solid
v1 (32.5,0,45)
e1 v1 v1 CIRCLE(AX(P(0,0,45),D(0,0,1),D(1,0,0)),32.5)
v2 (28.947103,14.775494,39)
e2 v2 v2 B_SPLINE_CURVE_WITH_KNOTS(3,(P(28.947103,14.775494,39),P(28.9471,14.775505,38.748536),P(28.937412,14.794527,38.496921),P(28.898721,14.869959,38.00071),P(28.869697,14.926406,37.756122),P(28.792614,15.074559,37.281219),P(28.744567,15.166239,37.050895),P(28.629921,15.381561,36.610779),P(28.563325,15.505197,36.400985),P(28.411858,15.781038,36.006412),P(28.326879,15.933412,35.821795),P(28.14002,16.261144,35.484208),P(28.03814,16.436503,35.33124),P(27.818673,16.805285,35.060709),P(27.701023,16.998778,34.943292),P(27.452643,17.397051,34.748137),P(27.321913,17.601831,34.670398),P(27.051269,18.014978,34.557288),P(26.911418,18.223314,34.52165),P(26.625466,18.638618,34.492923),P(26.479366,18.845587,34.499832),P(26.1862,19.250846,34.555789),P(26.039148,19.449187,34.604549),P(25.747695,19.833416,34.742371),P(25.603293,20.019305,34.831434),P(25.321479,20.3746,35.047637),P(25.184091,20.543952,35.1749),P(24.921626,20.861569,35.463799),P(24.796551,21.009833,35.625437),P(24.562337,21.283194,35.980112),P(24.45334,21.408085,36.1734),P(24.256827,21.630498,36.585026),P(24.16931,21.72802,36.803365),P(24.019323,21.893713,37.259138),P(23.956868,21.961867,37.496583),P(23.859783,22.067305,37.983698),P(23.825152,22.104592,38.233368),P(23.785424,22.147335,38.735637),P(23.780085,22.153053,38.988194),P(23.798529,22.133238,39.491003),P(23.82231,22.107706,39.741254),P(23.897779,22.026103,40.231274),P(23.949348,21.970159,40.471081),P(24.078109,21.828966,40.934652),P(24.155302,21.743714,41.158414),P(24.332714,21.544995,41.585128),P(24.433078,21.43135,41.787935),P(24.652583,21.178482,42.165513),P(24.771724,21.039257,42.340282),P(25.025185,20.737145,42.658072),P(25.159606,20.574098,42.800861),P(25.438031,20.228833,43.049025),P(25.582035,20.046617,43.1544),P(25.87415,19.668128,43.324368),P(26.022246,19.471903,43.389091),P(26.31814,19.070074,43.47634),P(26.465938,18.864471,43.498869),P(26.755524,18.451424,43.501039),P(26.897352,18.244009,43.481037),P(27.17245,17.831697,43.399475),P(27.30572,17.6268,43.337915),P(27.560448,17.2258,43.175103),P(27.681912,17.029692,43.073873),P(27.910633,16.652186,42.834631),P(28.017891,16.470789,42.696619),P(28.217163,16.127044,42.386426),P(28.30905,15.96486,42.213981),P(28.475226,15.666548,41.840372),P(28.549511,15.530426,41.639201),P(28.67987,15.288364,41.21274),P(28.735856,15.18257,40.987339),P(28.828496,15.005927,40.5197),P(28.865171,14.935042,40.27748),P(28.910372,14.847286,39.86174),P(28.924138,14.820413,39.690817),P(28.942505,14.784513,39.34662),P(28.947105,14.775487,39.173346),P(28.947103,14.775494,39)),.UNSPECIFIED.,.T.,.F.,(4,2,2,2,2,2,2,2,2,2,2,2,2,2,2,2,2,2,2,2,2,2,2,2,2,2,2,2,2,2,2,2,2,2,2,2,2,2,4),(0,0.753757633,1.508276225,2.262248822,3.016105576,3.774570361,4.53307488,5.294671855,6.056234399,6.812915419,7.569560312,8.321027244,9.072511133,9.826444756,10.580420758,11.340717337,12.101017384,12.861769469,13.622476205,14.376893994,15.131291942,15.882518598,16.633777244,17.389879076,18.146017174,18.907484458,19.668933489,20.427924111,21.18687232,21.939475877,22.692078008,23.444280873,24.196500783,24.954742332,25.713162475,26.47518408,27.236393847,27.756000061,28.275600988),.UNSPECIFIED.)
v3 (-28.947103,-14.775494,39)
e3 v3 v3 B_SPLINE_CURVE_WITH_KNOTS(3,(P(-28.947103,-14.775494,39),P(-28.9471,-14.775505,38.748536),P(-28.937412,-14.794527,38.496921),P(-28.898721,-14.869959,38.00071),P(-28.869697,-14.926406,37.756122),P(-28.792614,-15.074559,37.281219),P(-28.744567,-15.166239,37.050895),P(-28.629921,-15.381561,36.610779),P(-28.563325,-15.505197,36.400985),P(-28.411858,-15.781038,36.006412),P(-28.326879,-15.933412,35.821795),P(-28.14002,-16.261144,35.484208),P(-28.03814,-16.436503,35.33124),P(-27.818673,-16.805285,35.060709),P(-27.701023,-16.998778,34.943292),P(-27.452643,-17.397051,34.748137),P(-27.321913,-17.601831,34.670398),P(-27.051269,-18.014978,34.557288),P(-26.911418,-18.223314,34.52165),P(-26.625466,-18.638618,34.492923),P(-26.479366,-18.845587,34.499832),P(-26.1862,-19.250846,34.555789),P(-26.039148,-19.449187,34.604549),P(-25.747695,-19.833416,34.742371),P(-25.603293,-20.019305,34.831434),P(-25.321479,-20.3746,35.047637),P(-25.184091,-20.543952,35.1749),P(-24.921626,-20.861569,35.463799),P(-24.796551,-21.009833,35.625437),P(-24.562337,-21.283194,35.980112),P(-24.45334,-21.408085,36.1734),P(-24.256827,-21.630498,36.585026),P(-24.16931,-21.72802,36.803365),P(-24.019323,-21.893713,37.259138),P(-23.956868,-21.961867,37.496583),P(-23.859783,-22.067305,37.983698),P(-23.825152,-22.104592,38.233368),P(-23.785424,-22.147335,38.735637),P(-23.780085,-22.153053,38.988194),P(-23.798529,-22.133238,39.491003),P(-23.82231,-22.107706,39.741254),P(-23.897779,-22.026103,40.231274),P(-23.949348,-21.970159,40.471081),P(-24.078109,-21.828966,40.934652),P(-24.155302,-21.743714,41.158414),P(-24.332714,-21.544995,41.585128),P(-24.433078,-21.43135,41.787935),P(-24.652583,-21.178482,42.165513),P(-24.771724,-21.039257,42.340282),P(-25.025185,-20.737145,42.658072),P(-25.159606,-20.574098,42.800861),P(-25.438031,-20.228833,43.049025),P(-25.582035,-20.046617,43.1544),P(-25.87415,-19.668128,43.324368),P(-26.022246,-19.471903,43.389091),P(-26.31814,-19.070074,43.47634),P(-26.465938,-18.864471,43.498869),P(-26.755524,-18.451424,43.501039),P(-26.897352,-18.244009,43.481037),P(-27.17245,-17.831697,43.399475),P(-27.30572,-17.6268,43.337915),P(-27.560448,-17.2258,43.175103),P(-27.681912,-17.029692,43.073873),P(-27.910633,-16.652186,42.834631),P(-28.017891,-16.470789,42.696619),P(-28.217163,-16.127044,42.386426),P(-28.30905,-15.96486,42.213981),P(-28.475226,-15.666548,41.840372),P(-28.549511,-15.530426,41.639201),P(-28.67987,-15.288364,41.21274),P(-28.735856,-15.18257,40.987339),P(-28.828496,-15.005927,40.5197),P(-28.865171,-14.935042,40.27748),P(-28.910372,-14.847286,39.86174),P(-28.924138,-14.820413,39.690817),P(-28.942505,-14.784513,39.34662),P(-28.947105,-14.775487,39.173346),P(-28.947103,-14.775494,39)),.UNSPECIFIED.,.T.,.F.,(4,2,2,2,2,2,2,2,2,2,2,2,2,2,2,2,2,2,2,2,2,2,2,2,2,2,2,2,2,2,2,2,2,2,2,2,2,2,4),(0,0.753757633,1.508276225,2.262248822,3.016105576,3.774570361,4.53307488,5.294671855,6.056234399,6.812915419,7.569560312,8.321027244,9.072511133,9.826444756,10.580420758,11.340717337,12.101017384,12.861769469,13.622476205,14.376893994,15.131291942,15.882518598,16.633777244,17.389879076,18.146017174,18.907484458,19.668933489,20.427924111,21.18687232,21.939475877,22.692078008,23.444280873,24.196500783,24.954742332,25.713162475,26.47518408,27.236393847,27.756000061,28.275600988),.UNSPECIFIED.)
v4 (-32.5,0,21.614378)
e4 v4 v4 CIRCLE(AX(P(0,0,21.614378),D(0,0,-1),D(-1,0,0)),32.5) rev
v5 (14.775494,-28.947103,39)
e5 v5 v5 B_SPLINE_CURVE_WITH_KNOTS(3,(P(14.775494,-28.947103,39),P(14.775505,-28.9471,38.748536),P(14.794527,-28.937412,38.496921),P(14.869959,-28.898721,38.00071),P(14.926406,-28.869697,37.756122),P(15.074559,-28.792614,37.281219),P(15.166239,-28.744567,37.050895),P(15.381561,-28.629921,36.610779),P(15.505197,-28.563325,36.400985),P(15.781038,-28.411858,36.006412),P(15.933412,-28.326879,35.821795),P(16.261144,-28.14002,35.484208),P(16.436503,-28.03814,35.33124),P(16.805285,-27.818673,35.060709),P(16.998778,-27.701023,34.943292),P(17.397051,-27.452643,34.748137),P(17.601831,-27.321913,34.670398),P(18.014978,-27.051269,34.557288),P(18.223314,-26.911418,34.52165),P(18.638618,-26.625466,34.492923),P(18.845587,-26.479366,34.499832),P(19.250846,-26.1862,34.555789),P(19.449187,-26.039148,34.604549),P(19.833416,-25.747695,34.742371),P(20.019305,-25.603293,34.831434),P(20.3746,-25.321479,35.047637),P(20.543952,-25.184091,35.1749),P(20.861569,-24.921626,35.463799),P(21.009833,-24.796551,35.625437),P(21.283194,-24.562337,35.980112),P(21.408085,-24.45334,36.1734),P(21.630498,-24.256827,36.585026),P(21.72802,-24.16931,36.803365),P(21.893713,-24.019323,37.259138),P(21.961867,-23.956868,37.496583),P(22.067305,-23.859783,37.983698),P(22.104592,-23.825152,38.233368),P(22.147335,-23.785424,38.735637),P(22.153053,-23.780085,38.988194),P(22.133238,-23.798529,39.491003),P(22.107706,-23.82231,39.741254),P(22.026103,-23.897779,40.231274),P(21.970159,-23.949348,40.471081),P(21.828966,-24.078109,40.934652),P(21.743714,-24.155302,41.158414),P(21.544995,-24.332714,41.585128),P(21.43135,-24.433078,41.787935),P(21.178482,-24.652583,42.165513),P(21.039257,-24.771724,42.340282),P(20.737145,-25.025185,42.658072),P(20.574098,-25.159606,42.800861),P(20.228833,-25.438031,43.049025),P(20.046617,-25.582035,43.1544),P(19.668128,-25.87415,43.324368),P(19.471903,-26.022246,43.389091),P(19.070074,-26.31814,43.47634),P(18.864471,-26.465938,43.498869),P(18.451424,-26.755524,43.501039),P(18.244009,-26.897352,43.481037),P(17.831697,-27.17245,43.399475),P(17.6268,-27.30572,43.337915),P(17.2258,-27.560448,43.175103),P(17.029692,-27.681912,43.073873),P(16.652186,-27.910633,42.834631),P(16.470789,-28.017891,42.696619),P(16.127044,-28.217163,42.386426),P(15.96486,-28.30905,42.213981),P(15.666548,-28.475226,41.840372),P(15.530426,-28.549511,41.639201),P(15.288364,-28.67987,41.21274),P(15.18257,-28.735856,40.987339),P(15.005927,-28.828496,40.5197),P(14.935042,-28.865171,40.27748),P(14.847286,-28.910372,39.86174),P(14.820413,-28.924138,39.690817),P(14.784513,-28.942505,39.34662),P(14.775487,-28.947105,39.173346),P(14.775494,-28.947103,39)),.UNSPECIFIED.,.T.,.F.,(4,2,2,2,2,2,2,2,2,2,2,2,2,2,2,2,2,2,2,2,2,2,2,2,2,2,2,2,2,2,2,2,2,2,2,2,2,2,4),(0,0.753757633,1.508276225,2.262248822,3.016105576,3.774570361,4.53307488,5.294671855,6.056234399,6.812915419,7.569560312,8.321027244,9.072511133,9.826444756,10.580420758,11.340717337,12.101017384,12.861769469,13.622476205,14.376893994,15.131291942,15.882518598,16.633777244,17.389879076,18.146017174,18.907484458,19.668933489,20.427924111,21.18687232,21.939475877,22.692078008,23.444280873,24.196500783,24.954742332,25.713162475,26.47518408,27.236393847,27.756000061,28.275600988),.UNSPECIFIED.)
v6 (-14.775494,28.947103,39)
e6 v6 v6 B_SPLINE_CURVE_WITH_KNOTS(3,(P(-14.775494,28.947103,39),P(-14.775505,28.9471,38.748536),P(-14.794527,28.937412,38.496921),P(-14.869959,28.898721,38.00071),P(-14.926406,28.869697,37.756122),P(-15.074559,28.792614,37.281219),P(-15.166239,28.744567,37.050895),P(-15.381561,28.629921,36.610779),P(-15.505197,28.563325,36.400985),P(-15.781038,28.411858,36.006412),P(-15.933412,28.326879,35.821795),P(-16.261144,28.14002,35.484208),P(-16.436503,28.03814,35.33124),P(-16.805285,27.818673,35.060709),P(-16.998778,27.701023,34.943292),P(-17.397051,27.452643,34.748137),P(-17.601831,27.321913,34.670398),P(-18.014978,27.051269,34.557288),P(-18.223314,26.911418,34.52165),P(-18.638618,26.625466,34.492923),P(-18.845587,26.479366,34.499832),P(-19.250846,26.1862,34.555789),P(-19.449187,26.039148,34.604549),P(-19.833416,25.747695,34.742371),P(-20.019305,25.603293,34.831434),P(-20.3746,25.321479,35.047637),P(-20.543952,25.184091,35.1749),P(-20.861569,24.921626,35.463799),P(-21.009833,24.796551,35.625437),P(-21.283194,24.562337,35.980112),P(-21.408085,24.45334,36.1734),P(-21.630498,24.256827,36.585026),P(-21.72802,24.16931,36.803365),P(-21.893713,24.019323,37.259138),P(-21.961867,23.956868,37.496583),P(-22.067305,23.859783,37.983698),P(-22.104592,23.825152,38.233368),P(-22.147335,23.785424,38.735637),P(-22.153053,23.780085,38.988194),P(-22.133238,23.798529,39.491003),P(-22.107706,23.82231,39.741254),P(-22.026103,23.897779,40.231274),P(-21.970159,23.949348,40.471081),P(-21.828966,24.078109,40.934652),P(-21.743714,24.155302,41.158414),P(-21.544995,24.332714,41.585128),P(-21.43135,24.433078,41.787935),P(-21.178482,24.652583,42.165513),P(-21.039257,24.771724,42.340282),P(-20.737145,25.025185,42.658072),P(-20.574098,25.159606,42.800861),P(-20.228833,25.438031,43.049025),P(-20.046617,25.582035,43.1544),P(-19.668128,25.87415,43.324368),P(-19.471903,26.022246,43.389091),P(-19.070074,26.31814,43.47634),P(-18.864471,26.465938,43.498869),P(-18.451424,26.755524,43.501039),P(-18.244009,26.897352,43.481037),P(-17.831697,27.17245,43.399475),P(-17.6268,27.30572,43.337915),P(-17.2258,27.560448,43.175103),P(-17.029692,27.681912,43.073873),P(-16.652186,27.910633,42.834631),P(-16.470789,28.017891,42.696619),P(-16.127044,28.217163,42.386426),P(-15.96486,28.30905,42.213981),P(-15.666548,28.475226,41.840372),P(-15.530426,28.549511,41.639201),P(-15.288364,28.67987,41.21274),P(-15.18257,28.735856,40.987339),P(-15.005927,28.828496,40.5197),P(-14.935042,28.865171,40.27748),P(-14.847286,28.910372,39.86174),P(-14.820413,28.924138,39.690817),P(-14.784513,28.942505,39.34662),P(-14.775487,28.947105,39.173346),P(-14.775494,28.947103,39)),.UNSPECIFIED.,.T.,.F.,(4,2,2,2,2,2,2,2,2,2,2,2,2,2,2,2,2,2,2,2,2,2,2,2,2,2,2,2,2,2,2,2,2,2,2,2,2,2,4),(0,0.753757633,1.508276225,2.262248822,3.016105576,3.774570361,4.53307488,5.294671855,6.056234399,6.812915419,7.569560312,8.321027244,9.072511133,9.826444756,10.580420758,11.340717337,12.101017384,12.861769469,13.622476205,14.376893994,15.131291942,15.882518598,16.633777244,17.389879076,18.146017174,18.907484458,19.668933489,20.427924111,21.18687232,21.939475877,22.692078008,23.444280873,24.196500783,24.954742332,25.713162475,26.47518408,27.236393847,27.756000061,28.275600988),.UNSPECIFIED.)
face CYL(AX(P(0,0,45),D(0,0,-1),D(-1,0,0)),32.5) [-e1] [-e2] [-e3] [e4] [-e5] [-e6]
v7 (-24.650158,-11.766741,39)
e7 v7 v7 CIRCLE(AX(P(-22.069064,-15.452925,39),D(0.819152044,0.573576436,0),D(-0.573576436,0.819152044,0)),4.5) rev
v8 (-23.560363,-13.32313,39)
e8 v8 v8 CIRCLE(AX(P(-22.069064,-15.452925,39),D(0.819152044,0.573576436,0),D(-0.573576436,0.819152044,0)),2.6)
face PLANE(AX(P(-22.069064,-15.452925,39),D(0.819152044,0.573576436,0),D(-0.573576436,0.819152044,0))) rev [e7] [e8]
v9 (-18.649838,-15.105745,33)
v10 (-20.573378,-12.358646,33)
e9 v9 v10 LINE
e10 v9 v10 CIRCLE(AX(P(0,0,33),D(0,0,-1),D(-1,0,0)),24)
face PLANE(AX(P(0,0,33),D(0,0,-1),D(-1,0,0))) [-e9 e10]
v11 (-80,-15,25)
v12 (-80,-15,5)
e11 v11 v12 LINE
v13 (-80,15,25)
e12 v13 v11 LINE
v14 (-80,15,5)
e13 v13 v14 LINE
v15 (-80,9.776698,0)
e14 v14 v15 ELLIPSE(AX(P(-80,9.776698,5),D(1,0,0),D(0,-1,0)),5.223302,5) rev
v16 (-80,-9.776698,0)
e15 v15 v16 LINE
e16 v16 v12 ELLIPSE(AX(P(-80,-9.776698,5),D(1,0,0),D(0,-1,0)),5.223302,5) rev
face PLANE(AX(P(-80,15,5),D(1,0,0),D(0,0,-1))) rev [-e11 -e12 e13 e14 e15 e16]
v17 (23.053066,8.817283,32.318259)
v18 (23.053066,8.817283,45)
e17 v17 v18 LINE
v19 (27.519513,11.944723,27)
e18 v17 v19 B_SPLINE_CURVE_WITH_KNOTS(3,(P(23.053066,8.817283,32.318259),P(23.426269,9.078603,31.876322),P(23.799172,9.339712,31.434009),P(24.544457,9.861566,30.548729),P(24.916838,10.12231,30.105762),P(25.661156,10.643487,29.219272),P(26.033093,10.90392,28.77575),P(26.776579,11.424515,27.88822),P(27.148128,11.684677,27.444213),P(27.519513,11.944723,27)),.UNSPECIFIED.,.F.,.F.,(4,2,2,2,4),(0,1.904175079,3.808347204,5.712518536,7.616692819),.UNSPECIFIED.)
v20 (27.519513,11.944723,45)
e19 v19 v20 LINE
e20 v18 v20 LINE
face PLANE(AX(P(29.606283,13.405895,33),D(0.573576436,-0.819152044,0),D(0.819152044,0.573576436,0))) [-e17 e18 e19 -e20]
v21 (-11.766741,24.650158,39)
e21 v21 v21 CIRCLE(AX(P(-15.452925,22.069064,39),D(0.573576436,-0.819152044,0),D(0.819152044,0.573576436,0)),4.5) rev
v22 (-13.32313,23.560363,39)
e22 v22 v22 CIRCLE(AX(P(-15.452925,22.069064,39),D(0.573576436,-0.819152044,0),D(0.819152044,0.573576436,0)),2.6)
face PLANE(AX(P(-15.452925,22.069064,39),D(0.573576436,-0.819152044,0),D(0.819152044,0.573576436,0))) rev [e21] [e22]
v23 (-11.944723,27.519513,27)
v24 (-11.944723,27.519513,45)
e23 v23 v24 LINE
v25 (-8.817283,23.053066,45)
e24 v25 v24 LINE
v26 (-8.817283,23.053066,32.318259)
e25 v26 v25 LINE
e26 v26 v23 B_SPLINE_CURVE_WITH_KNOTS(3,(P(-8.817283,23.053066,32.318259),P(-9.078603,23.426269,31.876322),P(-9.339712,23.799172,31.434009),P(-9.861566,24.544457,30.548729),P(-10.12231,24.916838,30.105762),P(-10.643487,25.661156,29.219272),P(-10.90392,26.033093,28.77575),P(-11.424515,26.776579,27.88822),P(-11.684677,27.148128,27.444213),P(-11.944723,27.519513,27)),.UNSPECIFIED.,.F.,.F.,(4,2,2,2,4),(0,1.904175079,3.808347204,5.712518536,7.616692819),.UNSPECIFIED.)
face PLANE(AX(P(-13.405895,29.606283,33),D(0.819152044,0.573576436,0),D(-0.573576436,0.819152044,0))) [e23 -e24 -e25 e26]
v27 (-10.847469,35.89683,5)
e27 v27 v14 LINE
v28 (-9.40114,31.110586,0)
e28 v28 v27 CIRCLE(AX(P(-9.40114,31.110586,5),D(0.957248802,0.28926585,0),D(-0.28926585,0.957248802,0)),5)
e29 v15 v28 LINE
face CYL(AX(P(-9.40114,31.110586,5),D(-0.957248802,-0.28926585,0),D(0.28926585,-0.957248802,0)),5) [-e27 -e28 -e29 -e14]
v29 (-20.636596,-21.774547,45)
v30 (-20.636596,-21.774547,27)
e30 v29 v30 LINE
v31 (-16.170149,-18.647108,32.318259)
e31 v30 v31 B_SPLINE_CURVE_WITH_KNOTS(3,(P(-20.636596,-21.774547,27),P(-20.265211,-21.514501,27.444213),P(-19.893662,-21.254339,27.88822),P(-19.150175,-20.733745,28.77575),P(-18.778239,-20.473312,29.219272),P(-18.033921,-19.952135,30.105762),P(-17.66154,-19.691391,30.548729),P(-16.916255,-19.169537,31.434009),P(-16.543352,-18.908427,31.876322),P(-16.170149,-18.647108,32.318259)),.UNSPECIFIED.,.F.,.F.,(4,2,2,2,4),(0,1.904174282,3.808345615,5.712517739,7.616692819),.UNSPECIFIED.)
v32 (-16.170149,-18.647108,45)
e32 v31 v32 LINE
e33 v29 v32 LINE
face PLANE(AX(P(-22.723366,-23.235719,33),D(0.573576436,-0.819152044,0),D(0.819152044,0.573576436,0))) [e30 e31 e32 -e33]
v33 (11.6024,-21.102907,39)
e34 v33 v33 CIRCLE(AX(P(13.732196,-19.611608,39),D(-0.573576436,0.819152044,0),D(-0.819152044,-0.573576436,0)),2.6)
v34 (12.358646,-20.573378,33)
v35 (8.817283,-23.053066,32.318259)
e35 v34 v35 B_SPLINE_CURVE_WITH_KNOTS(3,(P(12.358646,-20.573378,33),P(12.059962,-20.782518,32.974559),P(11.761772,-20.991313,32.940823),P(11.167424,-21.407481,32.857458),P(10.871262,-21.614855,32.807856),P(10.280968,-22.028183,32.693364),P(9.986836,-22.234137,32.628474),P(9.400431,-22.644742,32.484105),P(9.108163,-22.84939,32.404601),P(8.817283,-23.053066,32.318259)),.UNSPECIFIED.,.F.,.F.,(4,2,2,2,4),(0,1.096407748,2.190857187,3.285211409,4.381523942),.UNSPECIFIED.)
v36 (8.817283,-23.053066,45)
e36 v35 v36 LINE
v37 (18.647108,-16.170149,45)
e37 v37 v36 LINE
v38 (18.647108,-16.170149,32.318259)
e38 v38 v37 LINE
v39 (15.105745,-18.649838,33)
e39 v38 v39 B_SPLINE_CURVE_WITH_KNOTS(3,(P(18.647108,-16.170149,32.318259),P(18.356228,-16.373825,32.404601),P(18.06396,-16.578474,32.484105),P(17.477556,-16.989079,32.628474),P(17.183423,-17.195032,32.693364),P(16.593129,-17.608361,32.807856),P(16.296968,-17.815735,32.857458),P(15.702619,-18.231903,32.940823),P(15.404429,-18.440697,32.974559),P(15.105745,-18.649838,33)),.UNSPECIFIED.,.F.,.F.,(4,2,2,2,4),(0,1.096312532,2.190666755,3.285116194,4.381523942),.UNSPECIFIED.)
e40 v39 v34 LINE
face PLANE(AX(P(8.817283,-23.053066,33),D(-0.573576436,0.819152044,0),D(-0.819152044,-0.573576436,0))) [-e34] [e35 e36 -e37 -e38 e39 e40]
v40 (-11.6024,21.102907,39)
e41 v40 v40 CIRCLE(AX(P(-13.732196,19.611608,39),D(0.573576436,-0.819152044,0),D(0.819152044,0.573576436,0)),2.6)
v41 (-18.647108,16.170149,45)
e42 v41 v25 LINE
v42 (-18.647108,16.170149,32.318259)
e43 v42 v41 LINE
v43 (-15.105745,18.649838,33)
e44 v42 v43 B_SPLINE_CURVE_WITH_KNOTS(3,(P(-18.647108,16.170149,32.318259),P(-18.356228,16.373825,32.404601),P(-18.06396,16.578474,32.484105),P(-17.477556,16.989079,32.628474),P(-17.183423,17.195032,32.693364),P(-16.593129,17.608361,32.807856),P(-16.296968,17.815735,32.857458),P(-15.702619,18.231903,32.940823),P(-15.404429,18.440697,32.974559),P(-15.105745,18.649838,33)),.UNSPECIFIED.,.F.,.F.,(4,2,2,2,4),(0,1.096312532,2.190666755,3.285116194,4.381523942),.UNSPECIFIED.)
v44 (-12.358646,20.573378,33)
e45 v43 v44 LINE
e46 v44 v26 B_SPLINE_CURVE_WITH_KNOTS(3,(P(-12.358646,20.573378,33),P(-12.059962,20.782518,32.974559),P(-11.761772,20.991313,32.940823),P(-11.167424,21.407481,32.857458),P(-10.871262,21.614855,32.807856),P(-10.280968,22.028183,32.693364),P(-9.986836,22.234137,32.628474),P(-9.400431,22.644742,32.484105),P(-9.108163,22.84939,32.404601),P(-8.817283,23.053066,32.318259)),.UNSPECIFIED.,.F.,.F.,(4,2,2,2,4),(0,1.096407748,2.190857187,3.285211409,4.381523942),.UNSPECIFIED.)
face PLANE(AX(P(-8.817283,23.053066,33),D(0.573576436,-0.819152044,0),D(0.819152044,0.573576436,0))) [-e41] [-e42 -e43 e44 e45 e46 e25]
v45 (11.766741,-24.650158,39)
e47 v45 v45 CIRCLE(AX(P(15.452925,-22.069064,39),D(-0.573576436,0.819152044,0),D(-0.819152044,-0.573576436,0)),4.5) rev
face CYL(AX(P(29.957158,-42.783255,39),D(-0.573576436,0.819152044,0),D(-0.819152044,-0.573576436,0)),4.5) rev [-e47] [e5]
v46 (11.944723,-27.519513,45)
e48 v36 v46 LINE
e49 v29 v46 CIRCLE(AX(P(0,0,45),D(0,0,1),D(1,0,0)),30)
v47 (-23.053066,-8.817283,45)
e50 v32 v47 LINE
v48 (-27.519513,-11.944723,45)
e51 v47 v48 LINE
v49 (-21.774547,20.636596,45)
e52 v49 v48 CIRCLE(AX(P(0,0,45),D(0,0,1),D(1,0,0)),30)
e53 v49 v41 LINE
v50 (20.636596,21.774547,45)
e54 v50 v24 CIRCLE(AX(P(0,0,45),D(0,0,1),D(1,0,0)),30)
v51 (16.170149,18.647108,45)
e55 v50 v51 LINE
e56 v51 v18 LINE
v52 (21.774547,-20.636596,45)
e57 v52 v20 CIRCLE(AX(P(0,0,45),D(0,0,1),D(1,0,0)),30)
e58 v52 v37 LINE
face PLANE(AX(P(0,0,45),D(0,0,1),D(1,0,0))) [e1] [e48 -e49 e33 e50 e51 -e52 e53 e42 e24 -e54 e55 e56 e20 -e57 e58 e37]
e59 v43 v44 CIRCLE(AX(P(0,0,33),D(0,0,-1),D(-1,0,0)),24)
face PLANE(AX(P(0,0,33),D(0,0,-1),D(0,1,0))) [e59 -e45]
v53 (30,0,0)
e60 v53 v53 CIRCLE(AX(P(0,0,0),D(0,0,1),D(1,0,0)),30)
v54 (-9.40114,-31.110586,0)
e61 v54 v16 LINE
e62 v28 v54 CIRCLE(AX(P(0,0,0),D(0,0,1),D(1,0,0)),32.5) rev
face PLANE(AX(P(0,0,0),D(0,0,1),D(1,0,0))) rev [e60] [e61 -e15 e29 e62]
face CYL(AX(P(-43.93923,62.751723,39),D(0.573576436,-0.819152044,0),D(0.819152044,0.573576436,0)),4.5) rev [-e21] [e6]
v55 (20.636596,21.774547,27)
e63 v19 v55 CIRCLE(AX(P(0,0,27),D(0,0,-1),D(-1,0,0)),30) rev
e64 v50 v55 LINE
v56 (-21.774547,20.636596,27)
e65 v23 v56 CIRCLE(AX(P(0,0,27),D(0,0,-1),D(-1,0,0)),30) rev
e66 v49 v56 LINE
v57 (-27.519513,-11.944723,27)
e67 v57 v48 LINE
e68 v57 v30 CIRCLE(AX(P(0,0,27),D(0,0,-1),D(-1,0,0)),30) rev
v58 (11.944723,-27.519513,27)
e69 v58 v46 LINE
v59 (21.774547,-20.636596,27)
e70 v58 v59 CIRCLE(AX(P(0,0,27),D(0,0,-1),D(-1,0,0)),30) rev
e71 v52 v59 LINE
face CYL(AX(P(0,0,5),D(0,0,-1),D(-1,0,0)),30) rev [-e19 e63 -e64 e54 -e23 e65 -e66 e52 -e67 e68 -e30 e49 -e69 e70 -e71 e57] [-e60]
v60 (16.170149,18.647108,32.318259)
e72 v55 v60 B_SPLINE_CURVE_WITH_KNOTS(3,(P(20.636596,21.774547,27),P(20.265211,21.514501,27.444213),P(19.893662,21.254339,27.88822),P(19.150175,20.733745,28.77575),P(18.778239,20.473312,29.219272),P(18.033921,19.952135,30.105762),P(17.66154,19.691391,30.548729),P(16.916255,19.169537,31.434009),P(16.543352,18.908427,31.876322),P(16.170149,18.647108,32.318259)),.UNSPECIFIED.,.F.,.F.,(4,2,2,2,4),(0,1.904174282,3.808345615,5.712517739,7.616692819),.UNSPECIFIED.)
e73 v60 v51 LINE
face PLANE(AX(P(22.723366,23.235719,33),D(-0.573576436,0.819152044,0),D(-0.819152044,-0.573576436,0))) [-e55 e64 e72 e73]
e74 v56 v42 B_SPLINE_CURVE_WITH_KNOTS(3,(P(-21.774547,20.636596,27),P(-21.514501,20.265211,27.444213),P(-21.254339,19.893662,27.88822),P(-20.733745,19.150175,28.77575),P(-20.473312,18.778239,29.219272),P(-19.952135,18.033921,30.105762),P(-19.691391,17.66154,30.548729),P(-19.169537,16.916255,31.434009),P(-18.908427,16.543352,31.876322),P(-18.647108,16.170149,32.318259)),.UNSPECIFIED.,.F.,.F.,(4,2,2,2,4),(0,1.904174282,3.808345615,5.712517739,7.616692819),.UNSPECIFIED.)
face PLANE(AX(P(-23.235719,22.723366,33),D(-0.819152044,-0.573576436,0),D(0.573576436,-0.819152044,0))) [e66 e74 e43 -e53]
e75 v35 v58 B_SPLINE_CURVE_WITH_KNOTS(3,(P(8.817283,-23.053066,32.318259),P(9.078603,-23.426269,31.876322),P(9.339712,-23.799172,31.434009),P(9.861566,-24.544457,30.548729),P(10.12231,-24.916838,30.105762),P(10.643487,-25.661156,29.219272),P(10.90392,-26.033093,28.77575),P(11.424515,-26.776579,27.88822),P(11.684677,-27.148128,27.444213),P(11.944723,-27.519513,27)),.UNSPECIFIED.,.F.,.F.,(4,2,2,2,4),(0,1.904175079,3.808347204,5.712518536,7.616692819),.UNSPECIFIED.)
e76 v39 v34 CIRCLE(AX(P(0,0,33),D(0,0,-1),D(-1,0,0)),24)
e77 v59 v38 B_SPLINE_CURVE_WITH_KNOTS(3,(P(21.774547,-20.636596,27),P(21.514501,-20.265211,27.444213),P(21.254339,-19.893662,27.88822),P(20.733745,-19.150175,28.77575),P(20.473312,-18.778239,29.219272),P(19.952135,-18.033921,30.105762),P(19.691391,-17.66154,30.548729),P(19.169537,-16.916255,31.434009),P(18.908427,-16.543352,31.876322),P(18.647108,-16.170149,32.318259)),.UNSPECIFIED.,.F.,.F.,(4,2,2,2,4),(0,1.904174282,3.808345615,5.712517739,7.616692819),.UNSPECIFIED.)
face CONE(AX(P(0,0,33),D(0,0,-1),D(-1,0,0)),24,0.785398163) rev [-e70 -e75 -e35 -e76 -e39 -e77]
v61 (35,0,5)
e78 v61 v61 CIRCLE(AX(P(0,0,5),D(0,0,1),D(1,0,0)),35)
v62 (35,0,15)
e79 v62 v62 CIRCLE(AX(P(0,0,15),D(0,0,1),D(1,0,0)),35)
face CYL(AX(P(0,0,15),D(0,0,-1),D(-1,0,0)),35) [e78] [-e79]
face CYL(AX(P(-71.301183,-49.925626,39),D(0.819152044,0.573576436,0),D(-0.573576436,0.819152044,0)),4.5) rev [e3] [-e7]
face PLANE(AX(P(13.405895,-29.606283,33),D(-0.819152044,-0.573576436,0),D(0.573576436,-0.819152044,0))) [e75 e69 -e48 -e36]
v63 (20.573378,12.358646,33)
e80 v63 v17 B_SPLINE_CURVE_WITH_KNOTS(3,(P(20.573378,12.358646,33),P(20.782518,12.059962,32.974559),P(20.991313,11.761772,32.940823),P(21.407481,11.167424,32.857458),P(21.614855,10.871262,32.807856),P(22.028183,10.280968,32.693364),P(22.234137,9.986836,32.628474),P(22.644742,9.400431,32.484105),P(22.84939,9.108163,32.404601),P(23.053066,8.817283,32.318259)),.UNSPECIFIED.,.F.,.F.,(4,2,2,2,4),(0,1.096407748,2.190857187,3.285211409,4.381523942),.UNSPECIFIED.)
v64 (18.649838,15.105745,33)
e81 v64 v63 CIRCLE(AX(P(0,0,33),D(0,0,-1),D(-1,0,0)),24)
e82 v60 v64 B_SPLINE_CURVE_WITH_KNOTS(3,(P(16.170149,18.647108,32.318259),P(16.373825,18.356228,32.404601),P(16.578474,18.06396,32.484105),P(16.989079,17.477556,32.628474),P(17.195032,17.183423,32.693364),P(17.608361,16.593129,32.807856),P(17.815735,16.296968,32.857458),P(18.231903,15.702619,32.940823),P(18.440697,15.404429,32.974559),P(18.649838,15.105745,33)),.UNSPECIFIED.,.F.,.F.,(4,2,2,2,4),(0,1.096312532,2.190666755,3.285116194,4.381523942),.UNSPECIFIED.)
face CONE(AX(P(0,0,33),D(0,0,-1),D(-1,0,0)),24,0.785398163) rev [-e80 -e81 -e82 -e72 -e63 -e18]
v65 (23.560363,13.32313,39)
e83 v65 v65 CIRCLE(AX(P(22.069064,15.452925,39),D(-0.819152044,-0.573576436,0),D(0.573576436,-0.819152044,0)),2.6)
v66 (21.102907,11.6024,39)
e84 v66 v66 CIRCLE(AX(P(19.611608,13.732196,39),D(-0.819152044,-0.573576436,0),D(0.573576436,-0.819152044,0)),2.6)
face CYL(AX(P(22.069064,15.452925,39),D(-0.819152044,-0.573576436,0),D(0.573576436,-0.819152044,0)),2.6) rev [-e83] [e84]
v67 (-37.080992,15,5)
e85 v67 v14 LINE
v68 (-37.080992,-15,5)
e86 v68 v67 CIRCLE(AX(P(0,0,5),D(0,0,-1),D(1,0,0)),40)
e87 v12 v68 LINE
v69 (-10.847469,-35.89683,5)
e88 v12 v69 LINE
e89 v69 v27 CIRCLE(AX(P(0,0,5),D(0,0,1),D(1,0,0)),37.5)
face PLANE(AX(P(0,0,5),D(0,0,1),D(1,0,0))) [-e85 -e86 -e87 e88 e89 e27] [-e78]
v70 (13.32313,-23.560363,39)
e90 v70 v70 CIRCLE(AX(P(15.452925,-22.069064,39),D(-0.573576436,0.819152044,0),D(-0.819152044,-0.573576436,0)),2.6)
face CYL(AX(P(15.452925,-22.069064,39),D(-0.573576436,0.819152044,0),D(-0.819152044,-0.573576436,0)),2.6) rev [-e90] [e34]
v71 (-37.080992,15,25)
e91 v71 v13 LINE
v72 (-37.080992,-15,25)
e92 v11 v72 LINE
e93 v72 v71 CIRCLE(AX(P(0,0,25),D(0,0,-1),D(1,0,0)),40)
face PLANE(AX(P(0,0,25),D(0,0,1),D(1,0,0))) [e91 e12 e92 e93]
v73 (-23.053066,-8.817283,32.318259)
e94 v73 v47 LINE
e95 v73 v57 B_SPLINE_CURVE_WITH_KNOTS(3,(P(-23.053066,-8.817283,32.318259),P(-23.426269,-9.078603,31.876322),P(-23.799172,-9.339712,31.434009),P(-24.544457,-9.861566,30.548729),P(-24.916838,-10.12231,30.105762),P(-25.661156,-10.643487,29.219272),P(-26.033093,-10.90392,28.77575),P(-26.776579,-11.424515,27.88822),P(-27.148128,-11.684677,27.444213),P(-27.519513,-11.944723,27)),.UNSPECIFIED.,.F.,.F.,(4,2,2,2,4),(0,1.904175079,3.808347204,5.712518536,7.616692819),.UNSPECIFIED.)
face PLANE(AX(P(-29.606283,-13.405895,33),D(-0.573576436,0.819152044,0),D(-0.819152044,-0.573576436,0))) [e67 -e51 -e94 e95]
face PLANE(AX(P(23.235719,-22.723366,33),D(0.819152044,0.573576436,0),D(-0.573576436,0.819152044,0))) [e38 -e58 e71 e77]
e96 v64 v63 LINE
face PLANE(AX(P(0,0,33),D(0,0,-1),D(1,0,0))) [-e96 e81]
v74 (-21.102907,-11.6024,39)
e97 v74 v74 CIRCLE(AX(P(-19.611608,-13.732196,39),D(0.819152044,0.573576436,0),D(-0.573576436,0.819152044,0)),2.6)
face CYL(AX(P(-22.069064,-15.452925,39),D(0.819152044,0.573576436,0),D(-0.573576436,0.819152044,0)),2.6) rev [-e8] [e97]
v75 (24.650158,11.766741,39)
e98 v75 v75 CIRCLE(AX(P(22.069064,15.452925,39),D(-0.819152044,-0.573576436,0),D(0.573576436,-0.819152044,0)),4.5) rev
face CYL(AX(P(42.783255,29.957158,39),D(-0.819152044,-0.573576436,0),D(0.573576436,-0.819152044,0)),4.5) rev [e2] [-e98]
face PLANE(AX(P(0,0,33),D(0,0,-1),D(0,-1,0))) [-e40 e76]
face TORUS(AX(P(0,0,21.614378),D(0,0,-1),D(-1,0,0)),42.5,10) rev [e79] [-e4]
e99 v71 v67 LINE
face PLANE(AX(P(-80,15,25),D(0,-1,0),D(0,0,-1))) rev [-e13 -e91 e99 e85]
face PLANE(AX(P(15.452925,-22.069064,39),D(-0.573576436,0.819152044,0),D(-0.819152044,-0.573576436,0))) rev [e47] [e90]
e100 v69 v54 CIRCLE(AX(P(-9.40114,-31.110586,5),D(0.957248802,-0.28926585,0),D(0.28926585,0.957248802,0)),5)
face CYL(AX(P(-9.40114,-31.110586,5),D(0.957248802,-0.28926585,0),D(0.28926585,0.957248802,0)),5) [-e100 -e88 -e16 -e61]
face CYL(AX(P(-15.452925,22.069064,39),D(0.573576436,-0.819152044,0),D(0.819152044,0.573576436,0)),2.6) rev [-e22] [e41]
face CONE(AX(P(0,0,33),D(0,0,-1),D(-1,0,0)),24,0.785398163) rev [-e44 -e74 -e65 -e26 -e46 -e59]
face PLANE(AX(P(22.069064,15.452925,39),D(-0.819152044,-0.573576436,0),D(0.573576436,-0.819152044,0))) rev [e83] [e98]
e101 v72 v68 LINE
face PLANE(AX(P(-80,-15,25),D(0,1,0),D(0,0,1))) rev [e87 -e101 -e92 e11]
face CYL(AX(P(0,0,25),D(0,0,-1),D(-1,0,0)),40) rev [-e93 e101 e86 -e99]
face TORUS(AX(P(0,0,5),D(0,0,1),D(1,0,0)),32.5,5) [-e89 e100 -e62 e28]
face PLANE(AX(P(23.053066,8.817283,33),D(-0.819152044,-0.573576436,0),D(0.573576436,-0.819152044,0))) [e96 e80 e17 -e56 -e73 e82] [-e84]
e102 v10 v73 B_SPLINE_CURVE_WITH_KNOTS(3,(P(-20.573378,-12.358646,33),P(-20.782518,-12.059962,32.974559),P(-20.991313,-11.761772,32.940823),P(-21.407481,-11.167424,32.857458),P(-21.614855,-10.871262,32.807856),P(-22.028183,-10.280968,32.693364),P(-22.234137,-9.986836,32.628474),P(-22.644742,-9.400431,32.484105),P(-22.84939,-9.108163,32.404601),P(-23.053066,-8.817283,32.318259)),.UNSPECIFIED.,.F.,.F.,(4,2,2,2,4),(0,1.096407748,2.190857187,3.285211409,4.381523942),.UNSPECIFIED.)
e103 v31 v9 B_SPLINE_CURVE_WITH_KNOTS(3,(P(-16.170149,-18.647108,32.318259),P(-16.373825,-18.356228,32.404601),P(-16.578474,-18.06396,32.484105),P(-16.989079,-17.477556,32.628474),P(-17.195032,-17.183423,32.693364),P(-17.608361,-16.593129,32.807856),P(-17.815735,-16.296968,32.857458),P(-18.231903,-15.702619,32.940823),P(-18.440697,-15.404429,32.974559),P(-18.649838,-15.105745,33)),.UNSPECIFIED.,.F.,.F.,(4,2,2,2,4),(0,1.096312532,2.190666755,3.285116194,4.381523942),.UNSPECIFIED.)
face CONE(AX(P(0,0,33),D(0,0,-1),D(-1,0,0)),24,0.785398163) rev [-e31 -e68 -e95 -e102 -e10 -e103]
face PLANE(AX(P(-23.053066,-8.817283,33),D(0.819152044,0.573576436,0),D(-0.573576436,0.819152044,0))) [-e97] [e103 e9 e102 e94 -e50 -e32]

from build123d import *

# Parameters (mm, degrees)
ESQUISSE1_R                               = 30
BOSS_EXTRU_1_DEPTH                        = 5
ESQUISSE6_R                               = 35
ESQUISSE6_R_2                             = 30
BOSS_EXTRU_6_DEPTH                        = 10
ESQUISSE7_R                               = 32.5
ESQUISSE7_R_2                             = 30
BOSS_EXTRU_8_DEPTH                        = 30
CONG_2_R                                  = 10
BOSS_EXTRU_9_DEPTH                        = 20
BOSS_EXTRU_10_DEPTH                       = 12
CHANFREIN1_SIZE                           = 6
CONG_3_R                                  = 5
ENL_V_MAT_EXTRU_1_REACH                   = 93.085
ENL_V_MAT_EXTRU_1_END_RADIUS              = 32.5
ESQUISSE10_R                              = 4.5
ESQUISSE11_R                              = 4.5
ESQUISSE11_R_2                            = 2.6
BOSS_EXTRU_11_DEPTH                       = 3
R_P_TITION_CIRCULAIRE1_COUNT              = 4
CHANFREIN1_OF_R_P_TITION_CIRCULAIRE1_SIZE = 6


# Some blends are built 0.0001 mm under size
with BuildPart() as part:
    # Esquisse1 → Boss.-Extru.1 (new body)
    with BuildSketch(Plane.XY):
        with BuildLine():
            Line((-10.847469364, 35.896830061), (-80, 15))
            Line((-80, 15), (-80, -15))
            Line((-80, -15), (-10.847469364, -35.896830061))
            ThreePointArc((-10.847469364, -35.896830061), (37.5, 0), (-10.847469364, 35.896830061))
        make_face()
        Circle(ESQUISSE1_R, mode=Mode.SUBTRACT)
    extrude(amount=BOSS_EXTRU_1_DEPTH)

    # Esquisse6 → Boss.-Extru.6 (add)
    with BuildSketch(Plane.XY.offset(5)):
        Circle(ESQUISSE6_R)
        Circle(ESQUISSE6_R_2, mode=Mode.SUBTRACT)
    extrude(amount=BOSS_EXTRU_6_DEPTH)

    # Esquisse7 → Boss.-Extru.8 (add)
    with BuildSketch(Plane.XY.offset(15)):
        Circle(ESQUISSE7_R)
        Circle(ESQUISSE7_R_2, mode=Mode.SUBTRACT)
    extrude(amount=BOSS_EXTRU_8_DEPTH)

    # Congé2
    # the kernel refuses this fillet: 10 mm, written as the material it adds along each edge
    with BuildSketch(Plane(origin=(0, 0, 15), x_dir=(1, 0, 0), z_dir=(0, -1, 0))) as cong_2_piece_1:
        with BuildLine():
            CenterArc((42.5, 6.614378278), CONG_2_R, 180, 41.409622109)
            Line((32.5, 6.614378278), (32.3, 6.614378278))
            Line((32.3, 6.614378278), (32.3, 0))
            Line((32.3, 0), (32.5, -0.2))
            ThreePointArc((32.5, -0.2), (33.75, -0.2), (34.85, -0.132287566))
            Line((34.85, -0.132287566), (35, 0))
        make_face()
    revolve(axis=Axis((0, 0, 15), (0, 0, 1)))

    # Esquisse8 → Boss.-Extru.9 (add)
    with BuildSketch(Plane.XY.offset(5)):
        with BuildLine():
            Line((-80, 15), (-37.080992435, 15))
            ThreePointArc((-37.080992435, 15), (-40, 0), (-37.080992435, -15))
            Line((-37.080992435, -15), (-80, -15))
            Line((-80, -15), (-80, 15))
        make_face()
    extrude(amount=BOSS_EXTRU_9_DEPTH)

    # Esquisse9 → Boss.-Extru.10 (add)
    with BuildSketch(Plane.XY.offset(45)):
        Polygon((-29.606282822, -13.405894878), (-22.723365586, -23.235719409), (-16.170149231, -18.647107918), (-23.053066468, -8.817283387), align=None)
    boss_extru_10 = extrude(amount=-BOSS_EXTRU_10_DEPTH)

    # Chanfrein1
    # the kernel refuses this chamfer: 6 mm, written as the material it adds along each edge
    with BuildSketch(Plane(origin=(0, 0, 33), x_dir=(-0.2418024484236128, -0.9703254999928355, 0), z_dir=(0.9703254999928355, -0.2418024484236128, 0))) as chanfrein1_piece_1_section:
        Polygon((30, CHANFREIN1_SIZE), (30 - CHANFREIN1_SIZE, 0), (30, 0), align=None)
    chanfrein1_piece_1 = revolve(axis=Axis((0, 0, 33), (0, 0, -1)), revolution_arc=82.01410645, mode=Mode.PRIVATE)
    chanfrein1_piece_1 = split(chanfrein1_piece_1, bisect_by=Plane(origin=(-19.354245876, -20.876636392, 31.008979001), z_dir=(-0.573576436351043, 0.819152044288994, 0)), keep=Keep.TOP, mode=Mode.PRIVATE)
    chanfrein1_piece_1 = split(chanfrein1_piece_1, bisect_by=Plane(origin=(-26.237163113, -11.04681186, 31.008979001), z_dir=(0.5735764363510415, -0.8191520442889951, 0)), keep=Keep.TOP, mode=Mode.PRIVATE)
    chanfrein1_piece_1 = split(chanfrein1_piece_1, bisect_by=Plane(origin=(-19.611607849, -13.732195653, 31.008979001), z_dir=(-0.8191520442889946, -0.5735764363510422, 0)), keep=Keep.TOP, mode=Mode.PRIVATE)
    add(chanfrein1_piece_1)

    # Congé3
    cong_3_edges = [part.edges().sort_by_distance(p)[0] for p in [
        (37.5, 0, 0),
        (-45.423734682, 25.44841503, 0),
        (-45.423734682, -25.44841503, 0),
    ]]
    fillet(cong_3_edges, radius=CONG_3_R - 0.0001)  # a hair under: the kernel refuses the full size

    # Enlèv. mat.-Extru.1: up to this cylinder (the profile starts inside it)
    enl_v_mat_extru_1_end = Plane(origin=(0, 0, 39), z_dir=(0, 0, -1)) * Cylinder(ENL_V_MAT_EXTRU_1_END_RADIUS, 252.17, mode=Mode.PRIVATE)
    # Esquisse10 → Enlèv. mat.-Extru.1 (cut, up to the surface)
    with BuildSketch(Plane(origin=(-19.611607849, -13.732195653, 0), x_dir=(0, 0, -1), z_dir=(0.8191520442889946, 0.5735764363510424, 0)), mode=Mode.PRIVATE) as enl_v_mat_extru_1_sk1:
        with Locations(Location((-39, 0, 0), (0, 0, 90))):
            Circle(ESQUISSE10_R)
    enl_v_mat_extru_1_tool1 = extrude(enl_v_mat_extru_1_sk1.sketch, amount=-ENL_V_MAT_EXTRU_1_REACH, mode=Mode.PRIVATE) & enl_v_mat_extru_1_end
    enl_v_mat_extru_1 = enl_v_mat_extru_1_tool1.solids().sort_by_distance((-19.611608, -13.732196, 39))[0]
    add(enl_v_mat_extru_1, mode=Mode.SUBTRACT)

    # Esquisse11 → Boss.-Extru.11 (add)
    with BuildSketch(Plane(origin=(-19.611607849, -13.732195653, 0), x_dir=(0, 0, -1), z_dir=(0.8191520442889946, 0.5735764363510424, 0))):
        with Locations(Location((-39, 0, 0), (0, 0, 90))):
            Circle(ESQUISSE11_R)
        with Locations(Location((-39, 0, 0), (0, 0, 90))):
            Circle(ESQUISSE11_R_2, mode=Mode.SUBTRACT)
    boss_extru_11 = extrude(amount=-BOSS_EXTRU_11_DEPTH)

    # Répétition circulaire1: Boss.-Extru.10, Enlèv. mat.-Extru.1, Boss.-Extru.11 ×4 about axis
    r_p_tition_circulaire1_axis = Axis((0, 0, 0), (0, 0, 1))
    add([boss_extru_10.rotate(r_p_tition_circulaire1_axis, i * 360 / R_P_TITION_CIRCULAIRE1_COUNT) for i in range(1, R_P_TITION_CIRCULAIRE1_COUNT)])
    add([enl_v_mat_extru_1.rotate(r_p_tition_circulaire1_axis, i * 360 / R_P_TITION_CIRCULAIRE1_COUNT) for i in range(1, R_P_TITION_CIRCULAIRE1_COUNT)], mode=Mode.SUBTRACT)
    add([boss_extru_11.rotate(r_p_tition_circulaire1_axis, i * 360 / R_P_TITION_CIRCULAIRE1_COUNT) for i in range(1, R_P_TITION_CIRCULAIRE1_COUNT)])

    # Chanfrein1 of Répétition circulaire1
    # the kernel refuses this chamfer: 6 mm, written as the material it adds along each edge
    with BuildSketch(Plane(origin=(0, 0, 33), x_dir=(0.9703254999928355, -0.24180244842361298, 0), z_dir=(0.24180244842361298, 0.9703254999928355, 0))) as chanfrein1_of_r_p_tition_circulaire1_piece_1_section:
        Polygon((30, CHANFREIN1_OF_R_P_TITION_CIRCULAIRE1_SIZE), (30 - CHANFREIN1_OF_R_P_TITION_CIRCULAIRE1_SIZE, 0), (30, 0), align=None)
    chanfrein1_of_r_p_tition_circulaire1_piece_1 = revolve(axis=Axis((0, 0, 33), (0, 0, -1)), revolution_arc=82.01410645, mode=Mode.PRIVATE)
    chanfrein1_of_r_p_tition_circulaire1_piece_1 = split(chanfrein1_of_r_p_tition_circulaire1_piece_1, bisect_by=Plane(origin=(20.876636392, -19.354245876, 31.008979001), z_dir=(-0.8191520442889941, -0.5735764363510429, 0)), keep=Keep.TOP, mode=Mode.PRIVATE)
    chanfrein1_of_r_p_tition_circulaire1_piece_1 = split(chanfrein1_of_r_p_tition_circulaire1_piece_1, bisect_by=Plane(origin=(11.04681186, -26.237163113, 31.008979001), z_dir=(0.8191520442889952, 0.5735764363510414, 0)), keep=Keep.TOP, mode=Mode.PRIVATE)
    chanfrein1_of_r_p_tition_circulaire1_piece_1 = split(chanfrein1_of_r_p_tition_circulaire1_piece_1, bisect_by=Plane(origin=(13.732195653, -19.611607849, 31.008979001), z_dir=(0.573576436351042, -0.8191520442889947, 0)), keep=Keep.TOP, mode=Mode.PRIVATE)
    add(chanfrein1_of_r_p_tition_circulaire1_piece_1)
    with BuildSketch(Plane(origin=(0, 0, 33), x_dir=(0.24180244842361312, 0.9703254999928353, 0), z_dir=(-0.9703254999928353, 0.24180244842361312, 0))) as chanfrein1_of_r_p_tition_circulaire1_piece_2_section:
        Polygon((30, CHANFREIN1_OF_R_P_TITION_CIRCULAIRE1_SIZE), (30 - CHANFREIN1_OF_R_P_TITION_CIRCULAIRE1_SIZE, 0), (30, 0), align=None)
    chanfrein1_of_r_p_tition_circulaire1_piece_2 = revolve(axis=Axis((0, 0, 33), (0, 0, -1)), revolution_arc=82.01410645, mode=Mode.PRIVATE)
    chanfrein1_of_r_p_tition_circulaire1_piece_2 = split(chanfrein1_of_r_p_tition_circulaire1_piece_2, bisect_by=Plane(origin=(19.354245876, 20.876636392, 31.008979001), z_dir=(0.5735764363510429, -0.8191520442889941, 0)), keep=Keep.TOP, mode=Mode.PRIVATE)
    chanfrein1_of_r_p_tition_circulaire1_piece_2 = split(chanfrein1_of_r_p_tition_circulaire1_piece_2, bisect_by=Plane(origin=(26.237163113, 11.04681186, 31.008979001), z_dir=(-0.5735764363510414, 0.8191520442889952, 0)), keep=Keep.TOP, mode=Mode.PRIVATE)
    chanfrein1_of_r_p_tition_circulaire1_piece_2 = split(chanfrein1_of_r_p_tition_circulaire1_piece_2, bisect_by=Plane(origin=(19.611607849, 13.732195653, 31.008979001), z_dir=(0.8191520442889947, 0.573576436351042, 0)), keep=Keep.TOP, mode=Mode.PRIVATE)
    add(chanfrein1_of_r_p_tition_circulaire1_piece_2)
    with BuildSketch(Plane(origin=(0, 0, 33), x_dir=(-0.9703254999928356, 0.24180244842361232, 0), z_dir=(-0.24180244842361232, -0.9703254999928356, 0))) as chanfrein1_of_r_p_tition_circulaire1_piece_3_section:
        Polygon((30, CHANFREIN1_OF_R_P_TITION_CIRCULAIRE1_SIZE), (30 - CHANFREIN1_OF_R_P_TITION_CIRCULAIRE1_SIZE, 0), (30, 0), align=None)
    chanfrein1_of_r_p_tition_circulaire1_piece_3 = revolve(axis=Axis((0, 0, 33), (0, 0, -1)), revolution_arc=82.01410645, mode=Mode.PRIVATE)
    chanfrein1_of_r_p_tition_circulaire1_piece_3 = split(chanfrein1_of_r_p_tition_circulaire1_piece_3, bisect_by=Plane(origin=(-20.876636392, 19.354245876, 31.008979001), z_dir=(0.8191520442889941, 0.5735764363510428, 0)), keep=Keep.TOP, mode=Mode.PRIVATE)
    chanfrein1_of_r_p_tition_circulaire1_piece_3 = split(chanfrein1_of_r_p_tition_circulaire1_piece_3, bisect_by=Plane(origin=(-11.04681186, 26.237163113, 31.008979001), z_dir=(-0.8191520442889952, -0.5735764363510413, 0)), keep=Keep.TOP, mode=Mode.PRIVATE)
    chanfrein1_of_r_p_tition_circulaire1_piece_3 = split(chanfrein1_of_r_p_tition_circulaire1_piece_3, bisect_by=Plane(origin=(-13.732195653, 19.611607849, 31.008979001), z_dir=(-0.5735764363510419, 0.8191520442889947, 0)), keep=Keep.TOP, mode=Mode.PRIVATE)
    add(chanfrein1_of_r_p_tition_circulaire1_piece_3)


solid = part.part
